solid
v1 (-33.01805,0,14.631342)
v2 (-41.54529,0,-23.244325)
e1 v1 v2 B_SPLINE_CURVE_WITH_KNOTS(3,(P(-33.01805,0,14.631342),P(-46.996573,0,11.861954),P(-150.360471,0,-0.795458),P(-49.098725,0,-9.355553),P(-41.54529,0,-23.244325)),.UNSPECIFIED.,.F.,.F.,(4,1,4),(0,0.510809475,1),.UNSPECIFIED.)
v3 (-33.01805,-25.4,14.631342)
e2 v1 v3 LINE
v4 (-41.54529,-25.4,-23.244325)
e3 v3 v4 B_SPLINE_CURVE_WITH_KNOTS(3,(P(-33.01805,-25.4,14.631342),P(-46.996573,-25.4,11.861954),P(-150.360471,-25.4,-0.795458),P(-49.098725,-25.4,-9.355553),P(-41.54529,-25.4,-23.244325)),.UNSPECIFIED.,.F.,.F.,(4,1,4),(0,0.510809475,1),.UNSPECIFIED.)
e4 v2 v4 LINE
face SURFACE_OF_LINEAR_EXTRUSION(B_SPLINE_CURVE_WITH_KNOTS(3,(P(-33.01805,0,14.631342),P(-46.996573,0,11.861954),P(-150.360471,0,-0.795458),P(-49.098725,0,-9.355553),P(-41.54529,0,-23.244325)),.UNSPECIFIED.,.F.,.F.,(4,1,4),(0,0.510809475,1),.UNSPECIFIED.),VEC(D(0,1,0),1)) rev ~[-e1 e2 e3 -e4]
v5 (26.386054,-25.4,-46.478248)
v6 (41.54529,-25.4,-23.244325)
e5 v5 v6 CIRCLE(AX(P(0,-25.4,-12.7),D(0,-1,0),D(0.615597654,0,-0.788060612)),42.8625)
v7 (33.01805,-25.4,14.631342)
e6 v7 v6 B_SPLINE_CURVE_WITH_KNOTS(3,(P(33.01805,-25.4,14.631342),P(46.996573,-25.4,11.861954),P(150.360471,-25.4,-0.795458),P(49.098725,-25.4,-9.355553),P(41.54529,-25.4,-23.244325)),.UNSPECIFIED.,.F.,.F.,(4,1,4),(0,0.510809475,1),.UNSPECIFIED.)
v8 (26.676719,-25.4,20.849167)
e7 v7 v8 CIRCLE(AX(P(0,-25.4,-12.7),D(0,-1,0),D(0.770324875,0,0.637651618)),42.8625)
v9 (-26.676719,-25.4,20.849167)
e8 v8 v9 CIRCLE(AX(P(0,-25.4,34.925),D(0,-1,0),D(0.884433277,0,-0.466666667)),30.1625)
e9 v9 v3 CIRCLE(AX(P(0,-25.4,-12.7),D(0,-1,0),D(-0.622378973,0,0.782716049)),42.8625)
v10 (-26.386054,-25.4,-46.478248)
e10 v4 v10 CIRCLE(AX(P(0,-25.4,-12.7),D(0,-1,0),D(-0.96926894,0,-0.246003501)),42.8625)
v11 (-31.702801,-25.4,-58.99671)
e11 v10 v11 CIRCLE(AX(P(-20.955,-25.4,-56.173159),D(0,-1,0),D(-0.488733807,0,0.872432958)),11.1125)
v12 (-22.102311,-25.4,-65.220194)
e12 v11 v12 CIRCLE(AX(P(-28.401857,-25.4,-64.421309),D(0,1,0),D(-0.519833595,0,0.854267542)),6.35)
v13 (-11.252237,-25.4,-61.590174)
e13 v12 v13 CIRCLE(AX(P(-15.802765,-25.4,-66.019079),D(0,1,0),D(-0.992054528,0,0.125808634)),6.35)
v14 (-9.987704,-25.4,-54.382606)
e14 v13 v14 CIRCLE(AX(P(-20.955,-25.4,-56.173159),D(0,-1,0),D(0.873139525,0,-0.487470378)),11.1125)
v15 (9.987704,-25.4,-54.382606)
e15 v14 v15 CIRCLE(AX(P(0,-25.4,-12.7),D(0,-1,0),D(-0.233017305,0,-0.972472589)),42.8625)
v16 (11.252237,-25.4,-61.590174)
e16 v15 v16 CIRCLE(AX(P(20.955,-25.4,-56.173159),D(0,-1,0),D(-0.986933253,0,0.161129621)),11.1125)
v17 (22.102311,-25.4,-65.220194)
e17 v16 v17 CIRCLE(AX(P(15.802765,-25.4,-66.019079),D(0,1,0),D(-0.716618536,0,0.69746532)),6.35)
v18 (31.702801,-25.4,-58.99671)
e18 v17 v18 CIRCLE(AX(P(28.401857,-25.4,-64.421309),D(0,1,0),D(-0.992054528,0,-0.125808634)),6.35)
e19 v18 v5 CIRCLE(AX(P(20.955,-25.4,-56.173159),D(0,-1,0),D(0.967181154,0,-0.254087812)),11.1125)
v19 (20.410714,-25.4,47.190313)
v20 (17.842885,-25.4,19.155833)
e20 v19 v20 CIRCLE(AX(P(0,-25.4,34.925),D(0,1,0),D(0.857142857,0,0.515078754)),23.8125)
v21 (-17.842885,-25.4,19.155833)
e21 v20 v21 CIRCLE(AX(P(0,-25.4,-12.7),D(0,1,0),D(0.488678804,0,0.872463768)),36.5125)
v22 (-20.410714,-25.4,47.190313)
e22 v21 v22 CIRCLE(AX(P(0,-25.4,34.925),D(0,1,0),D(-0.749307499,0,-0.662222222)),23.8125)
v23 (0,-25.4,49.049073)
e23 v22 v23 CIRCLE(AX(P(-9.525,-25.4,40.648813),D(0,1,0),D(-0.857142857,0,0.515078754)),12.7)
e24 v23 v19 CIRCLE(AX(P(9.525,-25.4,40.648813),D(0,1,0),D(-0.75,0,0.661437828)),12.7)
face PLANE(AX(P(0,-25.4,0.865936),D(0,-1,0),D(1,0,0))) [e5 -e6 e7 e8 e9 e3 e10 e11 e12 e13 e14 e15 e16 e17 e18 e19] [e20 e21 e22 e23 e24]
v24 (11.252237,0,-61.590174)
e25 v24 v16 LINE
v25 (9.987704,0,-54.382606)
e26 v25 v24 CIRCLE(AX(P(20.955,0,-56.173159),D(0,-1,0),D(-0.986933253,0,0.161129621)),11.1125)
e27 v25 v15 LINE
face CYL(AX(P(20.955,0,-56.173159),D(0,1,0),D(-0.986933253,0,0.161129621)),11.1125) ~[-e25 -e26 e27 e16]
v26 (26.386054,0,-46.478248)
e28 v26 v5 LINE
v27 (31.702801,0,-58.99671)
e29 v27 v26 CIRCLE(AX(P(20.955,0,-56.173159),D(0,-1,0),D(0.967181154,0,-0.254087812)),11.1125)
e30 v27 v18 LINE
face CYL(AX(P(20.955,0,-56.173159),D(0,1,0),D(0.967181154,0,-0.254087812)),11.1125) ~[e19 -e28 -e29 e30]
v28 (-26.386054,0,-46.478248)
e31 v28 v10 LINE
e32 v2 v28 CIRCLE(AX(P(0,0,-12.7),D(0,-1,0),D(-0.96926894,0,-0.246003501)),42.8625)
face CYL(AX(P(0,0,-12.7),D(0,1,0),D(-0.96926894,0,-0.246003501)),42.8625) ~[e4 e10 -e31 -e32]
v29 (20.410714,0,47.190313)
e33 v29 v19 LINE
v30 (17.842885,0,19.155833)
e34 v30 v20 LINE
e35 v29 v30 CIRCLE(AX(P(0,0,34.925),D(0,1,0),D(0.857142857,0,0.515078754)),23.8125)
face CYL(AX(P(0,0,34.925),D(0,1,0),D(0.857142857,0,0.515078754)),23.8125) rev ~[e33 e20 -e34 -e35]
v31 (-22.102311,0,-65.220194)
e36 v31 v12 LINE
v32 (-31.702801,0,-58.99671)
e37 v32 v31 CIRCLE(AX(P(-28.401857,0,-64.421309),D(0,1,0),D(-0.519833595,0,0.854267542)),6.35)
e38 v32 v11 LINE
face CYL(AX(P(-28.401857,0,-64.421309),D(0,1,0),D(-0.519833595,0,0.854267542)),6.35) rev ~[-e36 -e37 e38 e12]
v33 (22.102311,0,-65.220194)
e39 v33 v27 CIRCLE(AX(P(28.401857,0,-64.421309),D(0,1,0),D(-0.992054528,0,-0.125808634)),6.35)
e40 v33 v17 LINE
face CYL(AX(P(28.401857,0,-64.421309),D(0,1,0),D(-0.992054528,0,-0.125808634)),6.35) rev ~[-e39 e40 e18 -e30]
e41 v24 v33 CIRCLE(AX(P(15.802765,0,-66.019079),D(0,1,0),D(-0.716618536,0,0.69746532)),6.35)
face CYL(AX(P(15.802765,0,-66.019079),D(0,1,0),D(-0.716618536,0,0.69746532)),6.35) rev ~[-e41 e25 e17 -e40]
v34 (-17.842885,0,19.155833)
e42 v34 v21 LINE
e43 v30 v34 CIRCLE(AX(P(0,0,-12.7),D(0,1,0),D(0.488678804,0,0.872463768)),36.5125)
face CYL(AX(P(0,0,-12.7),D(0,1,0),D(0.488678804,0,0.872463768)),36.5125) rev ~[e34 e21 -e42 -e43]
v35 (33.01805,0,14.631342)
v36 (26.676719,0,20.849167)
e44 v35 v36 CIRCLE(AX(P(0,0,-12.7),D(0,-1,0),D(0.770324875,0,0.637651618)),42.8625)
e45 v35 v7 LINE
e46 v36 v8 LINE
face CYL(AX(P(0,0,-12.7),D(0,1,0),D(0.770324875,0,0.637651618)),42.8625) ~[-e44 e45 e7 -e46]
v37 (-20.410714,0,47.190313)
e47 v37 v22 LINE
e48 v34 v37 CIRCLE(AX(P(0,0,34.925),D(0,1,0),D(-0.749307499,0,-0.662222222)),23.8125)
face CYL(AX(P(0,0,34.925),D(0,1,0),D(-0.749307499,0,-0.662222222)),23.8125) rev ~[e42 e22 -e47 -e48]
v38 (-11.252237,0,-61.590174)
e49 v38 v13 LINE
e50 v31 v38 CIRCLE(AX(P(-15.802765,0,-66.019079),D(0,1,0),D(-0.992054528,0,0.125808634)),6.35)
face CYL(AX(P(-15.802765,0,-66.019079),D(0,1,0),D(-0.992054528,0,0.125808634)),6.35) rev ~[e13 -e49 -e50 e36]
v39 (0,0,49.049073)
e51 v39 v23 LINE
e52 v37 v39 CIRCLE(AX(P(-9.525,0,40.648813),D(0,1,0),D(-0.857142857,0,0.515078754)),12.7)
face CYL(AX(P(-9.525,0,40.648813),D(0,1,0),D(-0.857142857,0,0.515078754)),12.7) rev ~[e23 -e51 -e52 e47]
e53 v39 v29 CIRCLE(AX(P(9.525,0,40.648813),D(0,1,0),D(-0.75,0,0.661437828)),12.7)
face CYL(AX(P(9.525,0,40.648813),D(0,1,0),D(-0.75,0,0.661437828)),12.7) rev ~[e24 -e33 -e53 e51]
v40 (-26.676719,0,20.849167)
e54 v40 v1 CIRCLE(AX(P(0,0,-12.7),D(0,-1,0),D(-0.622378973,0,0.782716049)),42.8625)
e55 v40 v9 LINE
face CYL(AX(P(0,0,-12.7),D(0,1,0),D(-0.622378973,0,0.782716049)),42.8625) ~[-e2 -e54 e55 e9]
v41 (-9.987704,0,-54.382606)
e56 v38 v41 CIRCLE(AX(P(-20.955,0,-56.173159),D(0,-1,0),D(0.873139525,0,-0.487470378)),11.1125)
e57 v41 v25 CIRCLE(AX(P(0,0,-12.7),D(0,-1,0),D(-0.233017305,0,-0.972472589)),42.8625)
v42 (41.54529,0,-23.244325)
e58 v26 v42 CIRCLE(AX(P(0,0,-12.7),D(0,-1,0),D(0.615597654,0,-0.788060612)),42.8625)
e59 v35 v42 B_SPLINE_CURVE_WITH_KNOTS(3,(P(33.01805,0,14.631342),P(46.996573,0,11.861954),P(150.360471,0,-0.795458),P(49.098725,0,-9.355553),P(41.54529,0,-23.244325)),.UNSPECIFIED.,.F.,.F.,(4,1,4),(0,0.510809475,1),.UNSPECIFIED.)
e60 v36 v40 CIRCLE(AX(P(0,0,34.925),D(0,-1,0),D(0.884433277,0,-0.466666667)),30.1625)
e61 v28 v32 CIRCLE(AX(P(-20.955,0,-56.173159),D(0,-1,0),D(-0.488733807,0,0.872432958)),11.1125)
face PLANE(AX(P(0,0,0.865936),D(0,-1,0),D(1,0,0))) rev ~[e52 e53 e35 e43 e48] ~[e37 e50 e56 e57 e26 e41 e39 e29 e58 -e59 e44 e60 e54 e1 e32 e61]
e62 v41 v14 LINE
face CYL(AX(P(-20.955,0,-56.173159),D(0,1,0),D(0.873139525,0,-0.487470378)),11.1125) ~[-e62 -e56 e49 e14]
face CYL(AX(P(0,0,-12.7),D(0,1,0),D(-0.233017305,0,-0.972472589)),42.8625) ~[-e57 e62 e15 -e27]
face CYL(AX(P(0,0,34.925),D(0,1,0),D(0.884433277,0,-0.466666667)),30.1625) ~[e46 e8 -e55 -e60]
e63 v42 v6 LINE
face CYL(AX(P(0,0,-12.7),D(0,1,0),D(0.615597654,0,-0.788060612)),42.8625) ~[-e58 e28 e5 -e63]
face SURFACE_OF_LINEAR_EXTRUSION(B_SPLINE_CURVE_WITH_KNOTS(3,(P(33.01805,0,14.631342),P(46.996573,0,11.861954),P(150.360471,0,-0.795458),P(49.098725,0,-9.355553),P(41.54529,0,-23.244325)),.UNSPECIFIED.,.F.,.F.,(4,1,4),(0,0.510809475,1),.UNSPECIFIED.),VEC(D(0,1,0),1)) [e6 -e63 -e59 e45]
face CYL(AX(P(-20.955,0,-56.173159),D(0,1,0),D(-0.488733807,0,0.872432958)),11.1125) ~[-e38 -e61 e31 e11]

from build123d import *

# Parameters (mm, degrees)
F1_DEPTH = 25.4


# Not quite as in the source:
# - a feature names something its author has since deleted; it is built from what else it names


with BuildPart() as f1:
    # F0 (on Front) → F1 (new body)
    with BuildSketch(Plane.XZ):
        with BuildLine():
            ThreePointArc((33.018049972, 14.6313424898), (30.0088601414, 17.9049378249), (26.6767187304, 20.8491666667))
            ThreePointArc((26.6767187304, 20.8491666667), (0, 65.0875), (-26.6767187304, 20.8491666667))
            ThreePointArc((-26.6767187304, 20.8491666667), (-30.0088601414, 17.9049378249), (-33.018049972, 14.6313424898))
            ThreePointArc((-33.018049972, 14.6313424898), (-41.8158398527, -3.2856787995), (-41.5452899235, -23.2443250813))
            ThreePointArc((-41.5452899235, -23.2443250813), (-35.8973631324, -36.1216401303), (-26.3860544261, -46.4782480018))
            ThreePointArc((-26.3860544261, -46.4782480018), (-18.6113486842, -51.3110295952), (-9.9877042304, -54.3826063299))
            ThreePointArc((-9.9877042304, -54.3826063299), (0, -55.5625), (9.9877042304, -54.3826063299))
            ThreePointArc((9.9877042304, -54.3826063299), (18.6113486842, -51.3110295952), (26.3860544261, -46.4782480018))
            ThreePointArc((26.3860544261, -46.4782480018), (35.8973631324, -36.1216401303), (41.5452899235, -23.2443250813))
            ThreePointArc((41.5452899235, -23.2443250813), (41.8158398527, -3.2856787995), (33.018049972, 14.6313424898))
        make_face()
        with BuildLine():
            ThreePointArc((20.4107142857, 47.190312821), (23.7132340956, 32.7529767549), (17.8428848253, 19.1558333333))
            ThreePointArc((17.8428848253, 19.1558333333), (0, -49.2125), (-17.8428848253, 19.1558333333))
            ThreePointArc((-17.8428848253, 19.1558333333), (-23.7132340956, 32.7529767549), (-20.4107142857, 47.190312821))
            ThreePointArc((-20.4107142857, 47.190312821), (-10.6767956636, 53.2964751512), (0, 49.0490730624))
            ThreePointArc((0, 49.0490730624), (10.6767956636, 53.2964751512), (20.4107142857, 47.190312821))
        make_face(mode=Mode.SUBTRACT)
        with BuildLine():
            ThreePointArc((31.7028005699, -58.996710055), (31.1832359324, -51.8291005513), (26.3860544261, -46.4782480018))
            ThreePointArc((26.3860544261, -46.4782480018), (18.6113486842, -51.3110295952), (9.9877042304, -54.3826063299))
            ThreePointArc((9.9877042304, -54.3826063299), (10.009677281, -58.0934630853), (11.2522370234, -61.5901738197))
            ThreePointArc((11.2522370234, -61.5901738197), (17.8174676094, -59.9971626047), (22.102310986, -65.220193776))
            ThreePointArc((22.102310986, -65.220193776), (24.9477521066, -59.0929266684), (31.7028005699, -58.996710055))
        make_face()
        with BuildLine():
            ThreePointArc((-9.9877042304, -54.3826063299), (-18.6113486842, -51.3110295952), (-26.3860544261, -46.4782480018))
            ThreePointArc((-26.3860544261, -46.4782480018), (-31.1832359324, -51.8291005513), (-31.7028005699, -58.996710055))
            ThreePointArc((-31.7028005699, -58.996710055), (-24.9477521066, -59.0929266684), (-22.102310986, -65.220193776))
            ThreePointArc((-22.102310986, -65.220193776), (-17.8174676094, -59.9971626047), (-11.2522370234, -61.5901738197))
            ThreePointArc((-11.2522370234, -61.5901738197), (-10.009677281, -58.0934630853), (-9.9877042304, -54.3826063299))
        make_face()
        with BuildLine():
            add(Edge.make_bspline(
                [(33.018049972, 14.6313424898), (46.9965733011, 11.8619536122), (150.360470689, -0.7954577234), (49.0987253283, -9.3555527531), (41.5452899235, -23.2443250813)],
                knots=[0, 0, 0, 0, 0.5108094749, 1, 1, 1, 1], degree=3))
            ThreePointArc((33.018049972, 14.6313424898), (41.8158398527, -3.2856787995), (41.5452899235, -23.2443250813))
        make_face()
        with BuildLine():
            ThreePointArc((-41.5452899235, -23.2443250813), (-41.8158398527, -3.2856787995), (-33.018049972, 14.6313424898))
            add(Edge.make_bspline(
                [(-33.018049972, 14.6313424898), (-46.9965733011, 11.8619536122), (-150.360470689, -0.7954577234), (-49.0987253283, -9.3555527531), (-41.5452899235, -23.2443250813)],
                knots=[0, 0, 0, 0, 0.5108094749, 1, 1, 1, 1], degree=3))
        make_face()
    extrude(amount=F1_DEPTH)


solid = f1.part
